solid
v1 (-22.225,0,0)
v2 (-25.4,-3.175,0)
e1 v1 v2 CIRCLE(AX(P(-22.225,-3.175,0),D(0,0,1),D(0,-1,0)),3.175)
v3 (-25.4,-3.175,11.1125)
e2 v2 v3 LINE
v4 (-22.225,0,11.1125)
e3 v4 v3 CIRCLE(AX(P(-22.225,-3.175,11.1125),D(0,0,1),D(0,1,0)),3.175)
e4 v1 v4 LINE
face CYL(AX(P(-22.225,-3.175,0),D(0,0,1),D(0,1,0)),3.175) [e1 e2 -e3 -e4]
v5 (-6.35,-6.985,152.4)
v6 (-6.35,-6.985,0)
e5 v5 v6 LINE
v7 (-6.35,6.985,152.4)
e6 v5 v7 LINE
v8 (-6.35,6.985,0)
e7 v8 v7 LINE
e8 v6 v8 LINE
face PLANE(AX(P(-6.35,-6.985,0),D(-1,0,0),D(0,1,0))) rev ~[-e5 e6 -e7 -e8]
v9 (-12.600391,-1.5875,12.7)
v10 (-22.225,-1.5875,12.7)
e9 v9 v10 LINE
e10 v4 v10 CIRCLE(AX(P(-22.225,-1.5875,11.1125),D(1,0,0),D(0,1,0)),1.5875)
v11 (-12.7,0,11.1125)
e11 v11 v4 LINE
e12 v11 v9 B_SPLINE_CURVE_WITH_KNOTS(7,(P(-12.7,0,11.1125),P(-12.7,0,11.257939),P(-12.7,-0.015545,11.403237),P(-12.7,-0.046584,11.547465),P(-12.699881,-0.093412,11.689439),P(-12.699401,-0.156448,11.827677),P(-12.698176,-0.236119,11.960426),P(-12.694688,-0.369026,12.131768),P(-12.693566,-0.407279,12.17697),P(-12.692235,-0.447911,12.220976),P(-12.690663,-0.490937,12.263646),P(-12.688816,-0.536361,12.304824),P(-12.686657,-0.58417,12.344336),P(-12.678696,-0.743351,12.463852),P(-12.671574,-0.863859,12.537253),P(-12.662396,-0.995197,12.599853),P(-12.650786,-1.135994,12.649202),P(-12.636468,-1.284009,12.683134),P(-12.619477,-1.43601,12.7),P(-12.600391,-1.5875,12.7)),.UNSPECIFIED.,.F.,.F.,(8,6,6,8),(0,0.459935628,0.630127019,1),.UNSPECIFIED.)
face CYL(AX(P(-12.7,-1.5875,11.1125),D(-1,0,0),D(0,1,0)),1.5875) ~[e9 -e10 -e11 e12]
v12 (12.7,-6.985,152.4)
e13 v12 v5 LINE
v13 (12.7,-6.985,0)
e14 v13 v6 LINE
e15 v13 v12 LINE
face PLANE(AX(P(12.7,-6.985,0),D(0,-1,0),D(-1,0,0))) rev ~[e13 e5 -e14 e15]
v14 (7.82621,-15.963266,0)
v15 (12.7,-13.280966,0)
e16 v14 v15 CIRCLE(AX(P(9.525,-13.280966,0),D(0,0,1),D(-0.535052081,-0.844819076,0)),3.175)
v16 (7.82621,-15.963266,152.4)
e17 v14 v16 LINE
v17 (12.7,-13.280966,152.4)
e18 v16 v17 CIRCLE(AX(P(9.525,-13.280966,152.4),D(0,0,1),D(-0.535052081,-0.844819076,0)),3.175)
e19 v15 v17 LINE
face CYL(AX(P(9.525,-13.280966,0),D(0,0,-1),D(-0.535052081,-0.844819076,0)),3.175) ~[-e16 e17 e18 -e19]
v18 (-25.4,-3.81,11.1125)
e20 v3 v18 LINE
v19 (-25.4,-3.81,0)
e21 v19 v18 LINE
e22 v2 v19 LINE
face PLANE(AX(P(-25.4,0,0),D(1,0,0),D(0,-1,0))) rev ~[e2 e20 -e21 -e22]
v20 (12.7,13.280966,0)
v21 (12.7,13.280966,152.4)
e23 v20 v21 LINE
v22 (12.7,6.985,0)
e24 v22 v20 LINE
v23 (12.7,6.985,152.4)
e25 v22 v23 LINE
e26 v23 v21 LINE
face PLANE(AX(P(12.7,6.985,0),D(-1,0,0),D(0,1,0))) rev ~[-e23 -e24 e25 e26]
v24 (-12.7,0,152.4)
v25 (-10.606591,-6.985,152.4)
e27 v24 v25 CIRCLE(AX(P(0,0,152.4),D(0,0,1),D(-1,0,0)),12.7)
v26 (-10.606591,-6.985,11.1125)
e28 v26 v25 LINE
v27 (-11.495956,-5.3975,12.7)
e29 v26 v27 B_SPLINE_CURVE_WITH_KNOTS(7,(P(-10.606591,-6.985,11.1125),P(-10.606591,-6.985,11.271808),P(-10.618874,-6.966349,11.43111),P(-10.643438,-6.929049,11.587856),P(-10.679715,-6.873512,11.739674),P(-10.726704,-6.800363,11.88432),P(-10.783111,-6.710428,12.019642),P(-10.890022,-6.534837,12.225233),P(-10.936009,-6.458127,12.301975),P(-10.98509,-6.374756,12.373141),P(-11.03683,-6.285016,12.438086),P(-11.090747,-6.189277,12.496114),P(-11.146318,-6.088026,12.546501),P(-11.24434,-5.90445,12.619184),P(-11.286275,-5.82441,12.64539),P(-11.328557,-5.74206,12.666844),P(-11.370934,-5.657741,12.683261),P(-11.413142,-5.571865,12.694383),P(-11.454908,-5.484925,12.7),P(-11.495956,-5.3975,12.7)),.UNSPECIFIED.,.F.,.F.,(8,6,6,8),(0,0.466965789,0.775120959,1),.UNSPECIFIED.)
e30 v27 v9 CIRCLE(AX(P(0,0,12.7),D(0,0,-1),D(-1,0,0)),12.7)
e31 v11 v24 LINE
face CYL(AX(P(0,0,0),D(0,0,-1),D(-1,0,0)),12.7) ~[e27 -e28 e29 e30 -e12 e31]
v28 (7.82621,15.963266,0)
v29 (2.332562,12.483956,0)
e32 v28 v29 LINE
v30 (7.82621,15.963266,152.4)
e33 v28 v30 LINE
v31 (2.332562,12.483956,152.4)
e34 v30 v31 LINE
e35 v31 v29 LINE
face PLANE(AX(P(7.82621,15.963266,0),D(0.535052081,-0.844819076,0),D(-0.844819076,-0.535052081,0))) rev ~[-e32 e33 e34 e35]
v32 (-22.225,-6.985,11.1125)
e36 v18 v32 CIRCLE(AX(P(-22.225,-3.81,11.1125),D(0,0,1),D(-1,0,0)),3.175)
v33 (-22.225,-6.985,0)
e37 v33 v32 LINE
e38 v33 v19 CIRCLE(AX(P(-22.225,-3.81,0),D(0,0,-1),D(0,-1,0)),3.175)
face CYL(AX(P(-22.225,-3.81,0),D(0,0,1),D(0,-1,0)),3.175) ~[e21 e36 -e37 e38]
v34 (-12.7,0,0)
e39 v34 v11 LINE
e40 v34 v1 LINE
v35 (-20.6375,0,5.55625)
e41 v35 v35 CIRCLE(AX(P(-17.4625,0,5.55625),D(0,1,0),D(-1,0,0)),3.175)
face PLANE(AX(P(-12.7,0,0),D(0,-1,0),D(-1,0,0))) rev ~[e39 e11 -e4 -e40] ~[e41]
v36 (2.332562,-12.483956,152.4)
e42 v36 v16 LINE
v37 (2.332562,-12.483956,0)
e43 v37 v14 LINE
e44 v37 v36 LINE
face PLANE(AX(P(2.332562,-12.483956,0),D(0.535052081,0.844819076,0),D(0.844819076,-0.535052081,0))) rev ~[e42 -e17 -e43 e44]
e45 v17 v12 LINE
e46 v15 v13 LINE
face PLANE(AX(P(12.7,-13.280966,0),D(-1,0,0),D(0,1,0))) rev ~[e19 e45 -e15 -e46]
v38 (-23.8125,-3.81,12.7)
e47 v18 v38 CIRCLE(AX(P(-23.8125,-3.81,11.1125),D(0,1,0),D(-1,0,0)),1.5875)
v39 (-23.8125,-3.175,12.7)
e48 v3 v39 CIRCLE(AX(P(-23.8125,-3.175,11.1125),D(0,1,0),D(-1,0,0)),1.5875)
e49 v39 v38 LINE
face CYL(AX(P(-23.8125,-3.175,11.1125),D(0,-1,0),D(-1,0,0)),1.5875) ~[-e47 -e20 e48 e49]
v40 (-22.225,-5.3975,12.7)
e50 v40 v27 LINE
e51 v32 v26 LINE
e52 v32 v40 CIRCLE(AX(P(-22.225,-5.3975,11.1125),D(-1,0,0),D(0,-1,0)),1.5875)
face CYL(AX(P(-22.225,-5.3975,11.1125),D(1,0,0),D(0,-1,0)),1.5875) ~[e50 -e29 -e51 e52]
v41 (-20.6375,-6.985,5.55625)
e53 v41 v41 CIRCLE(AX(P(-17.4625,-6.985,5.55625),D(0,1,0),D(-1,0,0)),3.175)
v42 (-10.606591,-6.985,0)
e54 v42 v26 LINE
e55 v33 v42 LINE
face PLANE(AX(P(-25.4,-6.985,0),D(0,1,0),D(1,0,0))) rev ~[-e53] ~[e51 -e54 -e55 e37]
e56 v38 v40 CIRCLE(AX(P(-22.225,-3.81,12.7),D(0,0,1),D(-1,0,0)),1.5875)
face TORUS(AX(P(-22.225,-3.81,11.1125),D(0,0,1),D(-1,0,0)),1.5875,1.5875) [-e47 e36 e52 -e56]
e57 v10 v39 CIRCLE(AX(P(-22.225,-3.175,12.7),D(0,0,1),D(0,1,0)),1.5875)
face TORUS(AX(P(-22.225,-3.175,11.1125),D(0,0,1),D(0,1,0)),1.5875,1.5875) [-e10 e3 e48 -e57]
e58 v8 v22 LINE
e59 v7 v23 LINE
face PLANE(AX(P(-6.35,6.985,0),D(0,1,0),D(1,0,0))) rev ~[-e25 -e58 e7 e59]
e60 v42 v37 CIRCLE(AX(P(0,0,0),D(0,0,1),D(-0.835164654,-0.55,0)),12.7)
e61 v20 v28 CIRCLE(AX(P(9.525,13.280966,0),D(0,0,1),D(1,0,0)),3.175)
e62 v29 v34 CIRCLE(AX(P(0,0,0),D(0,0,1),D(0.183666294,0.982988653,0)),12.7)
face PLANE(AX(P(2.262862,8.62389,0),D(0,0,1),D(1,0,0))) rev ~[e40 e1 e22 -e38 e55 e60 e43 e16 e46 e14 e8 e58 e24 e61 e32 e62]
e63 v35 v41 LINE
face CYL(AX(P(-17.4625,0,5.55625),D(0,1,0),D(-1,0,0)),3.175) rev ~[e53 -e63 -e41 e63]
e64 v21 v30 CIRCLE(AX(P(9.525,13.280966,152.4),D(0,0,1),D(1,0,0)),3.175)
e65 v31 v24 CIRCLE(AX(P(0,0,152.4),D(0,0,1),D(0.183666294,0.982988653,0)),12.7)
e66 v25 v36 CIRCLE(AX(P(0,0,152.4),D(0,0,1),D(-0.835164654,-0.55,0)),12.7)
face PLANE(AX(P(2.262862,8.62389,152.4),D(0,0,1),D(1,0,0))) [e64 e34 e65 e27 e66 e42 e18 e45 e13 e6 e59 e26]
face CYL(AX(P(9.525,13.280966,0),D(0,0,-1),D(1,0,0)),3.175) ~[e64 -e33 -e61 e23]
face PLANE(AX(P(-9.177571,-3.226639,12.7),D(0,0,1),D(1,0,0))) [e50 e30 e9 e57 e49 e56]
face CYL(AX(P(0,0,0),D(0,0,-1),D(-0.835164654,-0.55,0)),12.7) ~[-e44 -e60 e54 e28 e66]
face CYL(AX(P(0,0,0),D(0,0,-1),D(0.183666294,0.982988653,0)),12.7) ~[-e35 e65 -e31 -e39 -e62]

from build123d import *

# Parameters (mm, degrees)
F1_DEPTH = 152.4
F2_DEPTH = 12.7
F3_R     = 3.175
F4_R     = 1.5875
F5_R     = 3.175
F6_DEPTH = 25.4


# Not quite as in the source:
# - a feature names something its author has since deleted; it is built from what else it names


with BuildPart() as f1:
    # F0 (on Top) → F1 (new body)
    with BuildSketch(Plane.XY):
        with BuildLine():
            Line((-6.35, 6.985), (10.6065911112, 6.985))
            ThreePointArc((10.6065911112, 6.985), (7.0295838714, 10.5770955652), (2.33256194, 12.4839558953))
            Line((2.33256194, 12.4839558953), (-6.35, 6.985))
        make_face()
        with BuildLine():
            ThreePointArc((2.33256194, 12.4839558953), (7.0295838714, 10.5770955652), (10.6065911112, 6.985))
            Line((10.6065911112, 6.985), (12.7, 6.985))
            Line((12.7, 6.985), (12.7, 13.2809655419))
            ThreePointArc((12.7, 13.2809655419), (11.0558438219, 16.0625374343), (7.8262096422, 15.9632661068))
            Line((7.8262096422, 15.9632661068), (2.33256194, 12.4839558953))
        make_face()
        with BuildLine():
            Line((12.7, -6.985), (10.6065911112, -6.985))
            ThreePointArc((10.6065911112, -6.985), (7.0295838714, -10.5770955652), (2.33256194, -12.4839558953))
            Line((2.33256194, -12.4839558953), (7.8262096422, -15.9632661068))
            ThreePointArc((7.8262096422, -15.9632661068), (11.0558438219, -16.0625374343), (12.7, -13.2809655419))
            Line((12.7, -13.2809655419), (12.7, -6.985))
        make_face()
        with BuildLine():
            ThreePointArc((2.33256194, -12.4839558953), (7.0295838714, -10.5770955652), (10.6065911112, -6.985))
            Line((10.6065911112, -6.985), (0, -6.985))
            Line((0, -6.985), (-6.35, -6.985))
            Line((-6.35, -6.985), (2.33256194, -12.4839558953))
        make_face()
        with BuildLine():
            Line((-6.35, 6.985), (2.33256194, 12.4839558953))
            ThreePointArc((2.33256194, 12.4839558953), (-8.1137680323, 9.7701979672), (-12.7, 0))
            Line((-12.7, 0), (-6.35, 0))
            Line((-6.35, 0), (-6.35, 6.985))
        make_face()
        with BuildLine():
            ThreePointArc((-10.6065911112, -6.985), (-4.9673452332, -11.6882625456), (2.33256194, -12.4839558953))
            Line((2.33256194, -12.4839558953), (-6.35, -6.985))
            Line((-6.35, -6.985), (-10.6065911112, -6.985))
        make_face()
        with BuildLine():
            Line((-6.35, 0), (-12.7, 0))
            ThreePointArc((-12.7, 0), (-12.1653957419, -3.6459767476), (-10.6065911112, -6.985))
            Line((-10.6065911112, -6.985), (-6.35, -6.985))
            Line((-6.35, -6.985), (-6.35, 0))
        make_face()
    extrude(amount=F1_DEPTH)

    # F0 (on Top) → F2 (join)
    with BuildSketch(Plane.XY):
        with BuildLine():
            Line((-6.35, 0), (-12.7, 0))
            ThreePointArc((-12.7, 0), (-12.1653957419, -3.6459767476), (-10.6065911112, -6.985))
            Line((-10.6065911112, -6.985), (-6.35, -6.985))
            Line((-6.35, -6.985), (-6.35, 0))
        make_face()
        with BuildLine():
            Line((-6.35, 6.985), (2.33256194, 12.4839558953))
            ThreePointArc((2.33256194, 12.4839558953), (-8.1137680323, 9.7701979672), (-12.7, 0))
            Line((-12.7, 0), (-6.35, 0))
            Line((-6.35, 0), (-6.35, 6.985))
        make_face()
        with BuildLine():
            ThreePointArc((-10.6065911112, -6.985), (-12.1653957419, -3.6459767476), (-12.7, 0))
            Line((-12.7, 0), (-25.4, 0))
            Line((-25.4, 0), (-25.4, -6.985))
            Line((-25.4, -6.985), (-10.6065911112, -6.985))
        make_face()
    extrude(amount=F2_DEPTH)

    # F3
    f3_edges = [f1.edges().sort_by_distance(p)[0] for p in [
        (-25.4, 0, 6.35),
        (-25.4, -6.985, 6.35),
    ]]
    fillet(f3_edges, radius=F3_R)

    # F4
    f4_edges = [f1.edges().sort_by_distance(p)[0] for p in [
        (-17.4625, 0, 12.7),
        (-24.470064, -0.929936, 12.7),
        (-25.4, -3.4925, 12.7),
        (-24.470064, -6.055064, 12.7),
        (-16.415796, -6.985, 12.7),
    ]]
    fillet(f4_edges, radius=F4_R)

    # F5 (on face) → F6 (cut)
    with BuildSketch(Plane(origin=(0, 0, 0), x_dir=(-1, 0, 0), z_dir=(0, 1, 0))):
        with Locations((17.4625, 5.55625)):
            Circle(F5_R)
    extrude(amount=-F6_DEPTH, mode=Mode.SUBTRACT)


solid = f1.part
